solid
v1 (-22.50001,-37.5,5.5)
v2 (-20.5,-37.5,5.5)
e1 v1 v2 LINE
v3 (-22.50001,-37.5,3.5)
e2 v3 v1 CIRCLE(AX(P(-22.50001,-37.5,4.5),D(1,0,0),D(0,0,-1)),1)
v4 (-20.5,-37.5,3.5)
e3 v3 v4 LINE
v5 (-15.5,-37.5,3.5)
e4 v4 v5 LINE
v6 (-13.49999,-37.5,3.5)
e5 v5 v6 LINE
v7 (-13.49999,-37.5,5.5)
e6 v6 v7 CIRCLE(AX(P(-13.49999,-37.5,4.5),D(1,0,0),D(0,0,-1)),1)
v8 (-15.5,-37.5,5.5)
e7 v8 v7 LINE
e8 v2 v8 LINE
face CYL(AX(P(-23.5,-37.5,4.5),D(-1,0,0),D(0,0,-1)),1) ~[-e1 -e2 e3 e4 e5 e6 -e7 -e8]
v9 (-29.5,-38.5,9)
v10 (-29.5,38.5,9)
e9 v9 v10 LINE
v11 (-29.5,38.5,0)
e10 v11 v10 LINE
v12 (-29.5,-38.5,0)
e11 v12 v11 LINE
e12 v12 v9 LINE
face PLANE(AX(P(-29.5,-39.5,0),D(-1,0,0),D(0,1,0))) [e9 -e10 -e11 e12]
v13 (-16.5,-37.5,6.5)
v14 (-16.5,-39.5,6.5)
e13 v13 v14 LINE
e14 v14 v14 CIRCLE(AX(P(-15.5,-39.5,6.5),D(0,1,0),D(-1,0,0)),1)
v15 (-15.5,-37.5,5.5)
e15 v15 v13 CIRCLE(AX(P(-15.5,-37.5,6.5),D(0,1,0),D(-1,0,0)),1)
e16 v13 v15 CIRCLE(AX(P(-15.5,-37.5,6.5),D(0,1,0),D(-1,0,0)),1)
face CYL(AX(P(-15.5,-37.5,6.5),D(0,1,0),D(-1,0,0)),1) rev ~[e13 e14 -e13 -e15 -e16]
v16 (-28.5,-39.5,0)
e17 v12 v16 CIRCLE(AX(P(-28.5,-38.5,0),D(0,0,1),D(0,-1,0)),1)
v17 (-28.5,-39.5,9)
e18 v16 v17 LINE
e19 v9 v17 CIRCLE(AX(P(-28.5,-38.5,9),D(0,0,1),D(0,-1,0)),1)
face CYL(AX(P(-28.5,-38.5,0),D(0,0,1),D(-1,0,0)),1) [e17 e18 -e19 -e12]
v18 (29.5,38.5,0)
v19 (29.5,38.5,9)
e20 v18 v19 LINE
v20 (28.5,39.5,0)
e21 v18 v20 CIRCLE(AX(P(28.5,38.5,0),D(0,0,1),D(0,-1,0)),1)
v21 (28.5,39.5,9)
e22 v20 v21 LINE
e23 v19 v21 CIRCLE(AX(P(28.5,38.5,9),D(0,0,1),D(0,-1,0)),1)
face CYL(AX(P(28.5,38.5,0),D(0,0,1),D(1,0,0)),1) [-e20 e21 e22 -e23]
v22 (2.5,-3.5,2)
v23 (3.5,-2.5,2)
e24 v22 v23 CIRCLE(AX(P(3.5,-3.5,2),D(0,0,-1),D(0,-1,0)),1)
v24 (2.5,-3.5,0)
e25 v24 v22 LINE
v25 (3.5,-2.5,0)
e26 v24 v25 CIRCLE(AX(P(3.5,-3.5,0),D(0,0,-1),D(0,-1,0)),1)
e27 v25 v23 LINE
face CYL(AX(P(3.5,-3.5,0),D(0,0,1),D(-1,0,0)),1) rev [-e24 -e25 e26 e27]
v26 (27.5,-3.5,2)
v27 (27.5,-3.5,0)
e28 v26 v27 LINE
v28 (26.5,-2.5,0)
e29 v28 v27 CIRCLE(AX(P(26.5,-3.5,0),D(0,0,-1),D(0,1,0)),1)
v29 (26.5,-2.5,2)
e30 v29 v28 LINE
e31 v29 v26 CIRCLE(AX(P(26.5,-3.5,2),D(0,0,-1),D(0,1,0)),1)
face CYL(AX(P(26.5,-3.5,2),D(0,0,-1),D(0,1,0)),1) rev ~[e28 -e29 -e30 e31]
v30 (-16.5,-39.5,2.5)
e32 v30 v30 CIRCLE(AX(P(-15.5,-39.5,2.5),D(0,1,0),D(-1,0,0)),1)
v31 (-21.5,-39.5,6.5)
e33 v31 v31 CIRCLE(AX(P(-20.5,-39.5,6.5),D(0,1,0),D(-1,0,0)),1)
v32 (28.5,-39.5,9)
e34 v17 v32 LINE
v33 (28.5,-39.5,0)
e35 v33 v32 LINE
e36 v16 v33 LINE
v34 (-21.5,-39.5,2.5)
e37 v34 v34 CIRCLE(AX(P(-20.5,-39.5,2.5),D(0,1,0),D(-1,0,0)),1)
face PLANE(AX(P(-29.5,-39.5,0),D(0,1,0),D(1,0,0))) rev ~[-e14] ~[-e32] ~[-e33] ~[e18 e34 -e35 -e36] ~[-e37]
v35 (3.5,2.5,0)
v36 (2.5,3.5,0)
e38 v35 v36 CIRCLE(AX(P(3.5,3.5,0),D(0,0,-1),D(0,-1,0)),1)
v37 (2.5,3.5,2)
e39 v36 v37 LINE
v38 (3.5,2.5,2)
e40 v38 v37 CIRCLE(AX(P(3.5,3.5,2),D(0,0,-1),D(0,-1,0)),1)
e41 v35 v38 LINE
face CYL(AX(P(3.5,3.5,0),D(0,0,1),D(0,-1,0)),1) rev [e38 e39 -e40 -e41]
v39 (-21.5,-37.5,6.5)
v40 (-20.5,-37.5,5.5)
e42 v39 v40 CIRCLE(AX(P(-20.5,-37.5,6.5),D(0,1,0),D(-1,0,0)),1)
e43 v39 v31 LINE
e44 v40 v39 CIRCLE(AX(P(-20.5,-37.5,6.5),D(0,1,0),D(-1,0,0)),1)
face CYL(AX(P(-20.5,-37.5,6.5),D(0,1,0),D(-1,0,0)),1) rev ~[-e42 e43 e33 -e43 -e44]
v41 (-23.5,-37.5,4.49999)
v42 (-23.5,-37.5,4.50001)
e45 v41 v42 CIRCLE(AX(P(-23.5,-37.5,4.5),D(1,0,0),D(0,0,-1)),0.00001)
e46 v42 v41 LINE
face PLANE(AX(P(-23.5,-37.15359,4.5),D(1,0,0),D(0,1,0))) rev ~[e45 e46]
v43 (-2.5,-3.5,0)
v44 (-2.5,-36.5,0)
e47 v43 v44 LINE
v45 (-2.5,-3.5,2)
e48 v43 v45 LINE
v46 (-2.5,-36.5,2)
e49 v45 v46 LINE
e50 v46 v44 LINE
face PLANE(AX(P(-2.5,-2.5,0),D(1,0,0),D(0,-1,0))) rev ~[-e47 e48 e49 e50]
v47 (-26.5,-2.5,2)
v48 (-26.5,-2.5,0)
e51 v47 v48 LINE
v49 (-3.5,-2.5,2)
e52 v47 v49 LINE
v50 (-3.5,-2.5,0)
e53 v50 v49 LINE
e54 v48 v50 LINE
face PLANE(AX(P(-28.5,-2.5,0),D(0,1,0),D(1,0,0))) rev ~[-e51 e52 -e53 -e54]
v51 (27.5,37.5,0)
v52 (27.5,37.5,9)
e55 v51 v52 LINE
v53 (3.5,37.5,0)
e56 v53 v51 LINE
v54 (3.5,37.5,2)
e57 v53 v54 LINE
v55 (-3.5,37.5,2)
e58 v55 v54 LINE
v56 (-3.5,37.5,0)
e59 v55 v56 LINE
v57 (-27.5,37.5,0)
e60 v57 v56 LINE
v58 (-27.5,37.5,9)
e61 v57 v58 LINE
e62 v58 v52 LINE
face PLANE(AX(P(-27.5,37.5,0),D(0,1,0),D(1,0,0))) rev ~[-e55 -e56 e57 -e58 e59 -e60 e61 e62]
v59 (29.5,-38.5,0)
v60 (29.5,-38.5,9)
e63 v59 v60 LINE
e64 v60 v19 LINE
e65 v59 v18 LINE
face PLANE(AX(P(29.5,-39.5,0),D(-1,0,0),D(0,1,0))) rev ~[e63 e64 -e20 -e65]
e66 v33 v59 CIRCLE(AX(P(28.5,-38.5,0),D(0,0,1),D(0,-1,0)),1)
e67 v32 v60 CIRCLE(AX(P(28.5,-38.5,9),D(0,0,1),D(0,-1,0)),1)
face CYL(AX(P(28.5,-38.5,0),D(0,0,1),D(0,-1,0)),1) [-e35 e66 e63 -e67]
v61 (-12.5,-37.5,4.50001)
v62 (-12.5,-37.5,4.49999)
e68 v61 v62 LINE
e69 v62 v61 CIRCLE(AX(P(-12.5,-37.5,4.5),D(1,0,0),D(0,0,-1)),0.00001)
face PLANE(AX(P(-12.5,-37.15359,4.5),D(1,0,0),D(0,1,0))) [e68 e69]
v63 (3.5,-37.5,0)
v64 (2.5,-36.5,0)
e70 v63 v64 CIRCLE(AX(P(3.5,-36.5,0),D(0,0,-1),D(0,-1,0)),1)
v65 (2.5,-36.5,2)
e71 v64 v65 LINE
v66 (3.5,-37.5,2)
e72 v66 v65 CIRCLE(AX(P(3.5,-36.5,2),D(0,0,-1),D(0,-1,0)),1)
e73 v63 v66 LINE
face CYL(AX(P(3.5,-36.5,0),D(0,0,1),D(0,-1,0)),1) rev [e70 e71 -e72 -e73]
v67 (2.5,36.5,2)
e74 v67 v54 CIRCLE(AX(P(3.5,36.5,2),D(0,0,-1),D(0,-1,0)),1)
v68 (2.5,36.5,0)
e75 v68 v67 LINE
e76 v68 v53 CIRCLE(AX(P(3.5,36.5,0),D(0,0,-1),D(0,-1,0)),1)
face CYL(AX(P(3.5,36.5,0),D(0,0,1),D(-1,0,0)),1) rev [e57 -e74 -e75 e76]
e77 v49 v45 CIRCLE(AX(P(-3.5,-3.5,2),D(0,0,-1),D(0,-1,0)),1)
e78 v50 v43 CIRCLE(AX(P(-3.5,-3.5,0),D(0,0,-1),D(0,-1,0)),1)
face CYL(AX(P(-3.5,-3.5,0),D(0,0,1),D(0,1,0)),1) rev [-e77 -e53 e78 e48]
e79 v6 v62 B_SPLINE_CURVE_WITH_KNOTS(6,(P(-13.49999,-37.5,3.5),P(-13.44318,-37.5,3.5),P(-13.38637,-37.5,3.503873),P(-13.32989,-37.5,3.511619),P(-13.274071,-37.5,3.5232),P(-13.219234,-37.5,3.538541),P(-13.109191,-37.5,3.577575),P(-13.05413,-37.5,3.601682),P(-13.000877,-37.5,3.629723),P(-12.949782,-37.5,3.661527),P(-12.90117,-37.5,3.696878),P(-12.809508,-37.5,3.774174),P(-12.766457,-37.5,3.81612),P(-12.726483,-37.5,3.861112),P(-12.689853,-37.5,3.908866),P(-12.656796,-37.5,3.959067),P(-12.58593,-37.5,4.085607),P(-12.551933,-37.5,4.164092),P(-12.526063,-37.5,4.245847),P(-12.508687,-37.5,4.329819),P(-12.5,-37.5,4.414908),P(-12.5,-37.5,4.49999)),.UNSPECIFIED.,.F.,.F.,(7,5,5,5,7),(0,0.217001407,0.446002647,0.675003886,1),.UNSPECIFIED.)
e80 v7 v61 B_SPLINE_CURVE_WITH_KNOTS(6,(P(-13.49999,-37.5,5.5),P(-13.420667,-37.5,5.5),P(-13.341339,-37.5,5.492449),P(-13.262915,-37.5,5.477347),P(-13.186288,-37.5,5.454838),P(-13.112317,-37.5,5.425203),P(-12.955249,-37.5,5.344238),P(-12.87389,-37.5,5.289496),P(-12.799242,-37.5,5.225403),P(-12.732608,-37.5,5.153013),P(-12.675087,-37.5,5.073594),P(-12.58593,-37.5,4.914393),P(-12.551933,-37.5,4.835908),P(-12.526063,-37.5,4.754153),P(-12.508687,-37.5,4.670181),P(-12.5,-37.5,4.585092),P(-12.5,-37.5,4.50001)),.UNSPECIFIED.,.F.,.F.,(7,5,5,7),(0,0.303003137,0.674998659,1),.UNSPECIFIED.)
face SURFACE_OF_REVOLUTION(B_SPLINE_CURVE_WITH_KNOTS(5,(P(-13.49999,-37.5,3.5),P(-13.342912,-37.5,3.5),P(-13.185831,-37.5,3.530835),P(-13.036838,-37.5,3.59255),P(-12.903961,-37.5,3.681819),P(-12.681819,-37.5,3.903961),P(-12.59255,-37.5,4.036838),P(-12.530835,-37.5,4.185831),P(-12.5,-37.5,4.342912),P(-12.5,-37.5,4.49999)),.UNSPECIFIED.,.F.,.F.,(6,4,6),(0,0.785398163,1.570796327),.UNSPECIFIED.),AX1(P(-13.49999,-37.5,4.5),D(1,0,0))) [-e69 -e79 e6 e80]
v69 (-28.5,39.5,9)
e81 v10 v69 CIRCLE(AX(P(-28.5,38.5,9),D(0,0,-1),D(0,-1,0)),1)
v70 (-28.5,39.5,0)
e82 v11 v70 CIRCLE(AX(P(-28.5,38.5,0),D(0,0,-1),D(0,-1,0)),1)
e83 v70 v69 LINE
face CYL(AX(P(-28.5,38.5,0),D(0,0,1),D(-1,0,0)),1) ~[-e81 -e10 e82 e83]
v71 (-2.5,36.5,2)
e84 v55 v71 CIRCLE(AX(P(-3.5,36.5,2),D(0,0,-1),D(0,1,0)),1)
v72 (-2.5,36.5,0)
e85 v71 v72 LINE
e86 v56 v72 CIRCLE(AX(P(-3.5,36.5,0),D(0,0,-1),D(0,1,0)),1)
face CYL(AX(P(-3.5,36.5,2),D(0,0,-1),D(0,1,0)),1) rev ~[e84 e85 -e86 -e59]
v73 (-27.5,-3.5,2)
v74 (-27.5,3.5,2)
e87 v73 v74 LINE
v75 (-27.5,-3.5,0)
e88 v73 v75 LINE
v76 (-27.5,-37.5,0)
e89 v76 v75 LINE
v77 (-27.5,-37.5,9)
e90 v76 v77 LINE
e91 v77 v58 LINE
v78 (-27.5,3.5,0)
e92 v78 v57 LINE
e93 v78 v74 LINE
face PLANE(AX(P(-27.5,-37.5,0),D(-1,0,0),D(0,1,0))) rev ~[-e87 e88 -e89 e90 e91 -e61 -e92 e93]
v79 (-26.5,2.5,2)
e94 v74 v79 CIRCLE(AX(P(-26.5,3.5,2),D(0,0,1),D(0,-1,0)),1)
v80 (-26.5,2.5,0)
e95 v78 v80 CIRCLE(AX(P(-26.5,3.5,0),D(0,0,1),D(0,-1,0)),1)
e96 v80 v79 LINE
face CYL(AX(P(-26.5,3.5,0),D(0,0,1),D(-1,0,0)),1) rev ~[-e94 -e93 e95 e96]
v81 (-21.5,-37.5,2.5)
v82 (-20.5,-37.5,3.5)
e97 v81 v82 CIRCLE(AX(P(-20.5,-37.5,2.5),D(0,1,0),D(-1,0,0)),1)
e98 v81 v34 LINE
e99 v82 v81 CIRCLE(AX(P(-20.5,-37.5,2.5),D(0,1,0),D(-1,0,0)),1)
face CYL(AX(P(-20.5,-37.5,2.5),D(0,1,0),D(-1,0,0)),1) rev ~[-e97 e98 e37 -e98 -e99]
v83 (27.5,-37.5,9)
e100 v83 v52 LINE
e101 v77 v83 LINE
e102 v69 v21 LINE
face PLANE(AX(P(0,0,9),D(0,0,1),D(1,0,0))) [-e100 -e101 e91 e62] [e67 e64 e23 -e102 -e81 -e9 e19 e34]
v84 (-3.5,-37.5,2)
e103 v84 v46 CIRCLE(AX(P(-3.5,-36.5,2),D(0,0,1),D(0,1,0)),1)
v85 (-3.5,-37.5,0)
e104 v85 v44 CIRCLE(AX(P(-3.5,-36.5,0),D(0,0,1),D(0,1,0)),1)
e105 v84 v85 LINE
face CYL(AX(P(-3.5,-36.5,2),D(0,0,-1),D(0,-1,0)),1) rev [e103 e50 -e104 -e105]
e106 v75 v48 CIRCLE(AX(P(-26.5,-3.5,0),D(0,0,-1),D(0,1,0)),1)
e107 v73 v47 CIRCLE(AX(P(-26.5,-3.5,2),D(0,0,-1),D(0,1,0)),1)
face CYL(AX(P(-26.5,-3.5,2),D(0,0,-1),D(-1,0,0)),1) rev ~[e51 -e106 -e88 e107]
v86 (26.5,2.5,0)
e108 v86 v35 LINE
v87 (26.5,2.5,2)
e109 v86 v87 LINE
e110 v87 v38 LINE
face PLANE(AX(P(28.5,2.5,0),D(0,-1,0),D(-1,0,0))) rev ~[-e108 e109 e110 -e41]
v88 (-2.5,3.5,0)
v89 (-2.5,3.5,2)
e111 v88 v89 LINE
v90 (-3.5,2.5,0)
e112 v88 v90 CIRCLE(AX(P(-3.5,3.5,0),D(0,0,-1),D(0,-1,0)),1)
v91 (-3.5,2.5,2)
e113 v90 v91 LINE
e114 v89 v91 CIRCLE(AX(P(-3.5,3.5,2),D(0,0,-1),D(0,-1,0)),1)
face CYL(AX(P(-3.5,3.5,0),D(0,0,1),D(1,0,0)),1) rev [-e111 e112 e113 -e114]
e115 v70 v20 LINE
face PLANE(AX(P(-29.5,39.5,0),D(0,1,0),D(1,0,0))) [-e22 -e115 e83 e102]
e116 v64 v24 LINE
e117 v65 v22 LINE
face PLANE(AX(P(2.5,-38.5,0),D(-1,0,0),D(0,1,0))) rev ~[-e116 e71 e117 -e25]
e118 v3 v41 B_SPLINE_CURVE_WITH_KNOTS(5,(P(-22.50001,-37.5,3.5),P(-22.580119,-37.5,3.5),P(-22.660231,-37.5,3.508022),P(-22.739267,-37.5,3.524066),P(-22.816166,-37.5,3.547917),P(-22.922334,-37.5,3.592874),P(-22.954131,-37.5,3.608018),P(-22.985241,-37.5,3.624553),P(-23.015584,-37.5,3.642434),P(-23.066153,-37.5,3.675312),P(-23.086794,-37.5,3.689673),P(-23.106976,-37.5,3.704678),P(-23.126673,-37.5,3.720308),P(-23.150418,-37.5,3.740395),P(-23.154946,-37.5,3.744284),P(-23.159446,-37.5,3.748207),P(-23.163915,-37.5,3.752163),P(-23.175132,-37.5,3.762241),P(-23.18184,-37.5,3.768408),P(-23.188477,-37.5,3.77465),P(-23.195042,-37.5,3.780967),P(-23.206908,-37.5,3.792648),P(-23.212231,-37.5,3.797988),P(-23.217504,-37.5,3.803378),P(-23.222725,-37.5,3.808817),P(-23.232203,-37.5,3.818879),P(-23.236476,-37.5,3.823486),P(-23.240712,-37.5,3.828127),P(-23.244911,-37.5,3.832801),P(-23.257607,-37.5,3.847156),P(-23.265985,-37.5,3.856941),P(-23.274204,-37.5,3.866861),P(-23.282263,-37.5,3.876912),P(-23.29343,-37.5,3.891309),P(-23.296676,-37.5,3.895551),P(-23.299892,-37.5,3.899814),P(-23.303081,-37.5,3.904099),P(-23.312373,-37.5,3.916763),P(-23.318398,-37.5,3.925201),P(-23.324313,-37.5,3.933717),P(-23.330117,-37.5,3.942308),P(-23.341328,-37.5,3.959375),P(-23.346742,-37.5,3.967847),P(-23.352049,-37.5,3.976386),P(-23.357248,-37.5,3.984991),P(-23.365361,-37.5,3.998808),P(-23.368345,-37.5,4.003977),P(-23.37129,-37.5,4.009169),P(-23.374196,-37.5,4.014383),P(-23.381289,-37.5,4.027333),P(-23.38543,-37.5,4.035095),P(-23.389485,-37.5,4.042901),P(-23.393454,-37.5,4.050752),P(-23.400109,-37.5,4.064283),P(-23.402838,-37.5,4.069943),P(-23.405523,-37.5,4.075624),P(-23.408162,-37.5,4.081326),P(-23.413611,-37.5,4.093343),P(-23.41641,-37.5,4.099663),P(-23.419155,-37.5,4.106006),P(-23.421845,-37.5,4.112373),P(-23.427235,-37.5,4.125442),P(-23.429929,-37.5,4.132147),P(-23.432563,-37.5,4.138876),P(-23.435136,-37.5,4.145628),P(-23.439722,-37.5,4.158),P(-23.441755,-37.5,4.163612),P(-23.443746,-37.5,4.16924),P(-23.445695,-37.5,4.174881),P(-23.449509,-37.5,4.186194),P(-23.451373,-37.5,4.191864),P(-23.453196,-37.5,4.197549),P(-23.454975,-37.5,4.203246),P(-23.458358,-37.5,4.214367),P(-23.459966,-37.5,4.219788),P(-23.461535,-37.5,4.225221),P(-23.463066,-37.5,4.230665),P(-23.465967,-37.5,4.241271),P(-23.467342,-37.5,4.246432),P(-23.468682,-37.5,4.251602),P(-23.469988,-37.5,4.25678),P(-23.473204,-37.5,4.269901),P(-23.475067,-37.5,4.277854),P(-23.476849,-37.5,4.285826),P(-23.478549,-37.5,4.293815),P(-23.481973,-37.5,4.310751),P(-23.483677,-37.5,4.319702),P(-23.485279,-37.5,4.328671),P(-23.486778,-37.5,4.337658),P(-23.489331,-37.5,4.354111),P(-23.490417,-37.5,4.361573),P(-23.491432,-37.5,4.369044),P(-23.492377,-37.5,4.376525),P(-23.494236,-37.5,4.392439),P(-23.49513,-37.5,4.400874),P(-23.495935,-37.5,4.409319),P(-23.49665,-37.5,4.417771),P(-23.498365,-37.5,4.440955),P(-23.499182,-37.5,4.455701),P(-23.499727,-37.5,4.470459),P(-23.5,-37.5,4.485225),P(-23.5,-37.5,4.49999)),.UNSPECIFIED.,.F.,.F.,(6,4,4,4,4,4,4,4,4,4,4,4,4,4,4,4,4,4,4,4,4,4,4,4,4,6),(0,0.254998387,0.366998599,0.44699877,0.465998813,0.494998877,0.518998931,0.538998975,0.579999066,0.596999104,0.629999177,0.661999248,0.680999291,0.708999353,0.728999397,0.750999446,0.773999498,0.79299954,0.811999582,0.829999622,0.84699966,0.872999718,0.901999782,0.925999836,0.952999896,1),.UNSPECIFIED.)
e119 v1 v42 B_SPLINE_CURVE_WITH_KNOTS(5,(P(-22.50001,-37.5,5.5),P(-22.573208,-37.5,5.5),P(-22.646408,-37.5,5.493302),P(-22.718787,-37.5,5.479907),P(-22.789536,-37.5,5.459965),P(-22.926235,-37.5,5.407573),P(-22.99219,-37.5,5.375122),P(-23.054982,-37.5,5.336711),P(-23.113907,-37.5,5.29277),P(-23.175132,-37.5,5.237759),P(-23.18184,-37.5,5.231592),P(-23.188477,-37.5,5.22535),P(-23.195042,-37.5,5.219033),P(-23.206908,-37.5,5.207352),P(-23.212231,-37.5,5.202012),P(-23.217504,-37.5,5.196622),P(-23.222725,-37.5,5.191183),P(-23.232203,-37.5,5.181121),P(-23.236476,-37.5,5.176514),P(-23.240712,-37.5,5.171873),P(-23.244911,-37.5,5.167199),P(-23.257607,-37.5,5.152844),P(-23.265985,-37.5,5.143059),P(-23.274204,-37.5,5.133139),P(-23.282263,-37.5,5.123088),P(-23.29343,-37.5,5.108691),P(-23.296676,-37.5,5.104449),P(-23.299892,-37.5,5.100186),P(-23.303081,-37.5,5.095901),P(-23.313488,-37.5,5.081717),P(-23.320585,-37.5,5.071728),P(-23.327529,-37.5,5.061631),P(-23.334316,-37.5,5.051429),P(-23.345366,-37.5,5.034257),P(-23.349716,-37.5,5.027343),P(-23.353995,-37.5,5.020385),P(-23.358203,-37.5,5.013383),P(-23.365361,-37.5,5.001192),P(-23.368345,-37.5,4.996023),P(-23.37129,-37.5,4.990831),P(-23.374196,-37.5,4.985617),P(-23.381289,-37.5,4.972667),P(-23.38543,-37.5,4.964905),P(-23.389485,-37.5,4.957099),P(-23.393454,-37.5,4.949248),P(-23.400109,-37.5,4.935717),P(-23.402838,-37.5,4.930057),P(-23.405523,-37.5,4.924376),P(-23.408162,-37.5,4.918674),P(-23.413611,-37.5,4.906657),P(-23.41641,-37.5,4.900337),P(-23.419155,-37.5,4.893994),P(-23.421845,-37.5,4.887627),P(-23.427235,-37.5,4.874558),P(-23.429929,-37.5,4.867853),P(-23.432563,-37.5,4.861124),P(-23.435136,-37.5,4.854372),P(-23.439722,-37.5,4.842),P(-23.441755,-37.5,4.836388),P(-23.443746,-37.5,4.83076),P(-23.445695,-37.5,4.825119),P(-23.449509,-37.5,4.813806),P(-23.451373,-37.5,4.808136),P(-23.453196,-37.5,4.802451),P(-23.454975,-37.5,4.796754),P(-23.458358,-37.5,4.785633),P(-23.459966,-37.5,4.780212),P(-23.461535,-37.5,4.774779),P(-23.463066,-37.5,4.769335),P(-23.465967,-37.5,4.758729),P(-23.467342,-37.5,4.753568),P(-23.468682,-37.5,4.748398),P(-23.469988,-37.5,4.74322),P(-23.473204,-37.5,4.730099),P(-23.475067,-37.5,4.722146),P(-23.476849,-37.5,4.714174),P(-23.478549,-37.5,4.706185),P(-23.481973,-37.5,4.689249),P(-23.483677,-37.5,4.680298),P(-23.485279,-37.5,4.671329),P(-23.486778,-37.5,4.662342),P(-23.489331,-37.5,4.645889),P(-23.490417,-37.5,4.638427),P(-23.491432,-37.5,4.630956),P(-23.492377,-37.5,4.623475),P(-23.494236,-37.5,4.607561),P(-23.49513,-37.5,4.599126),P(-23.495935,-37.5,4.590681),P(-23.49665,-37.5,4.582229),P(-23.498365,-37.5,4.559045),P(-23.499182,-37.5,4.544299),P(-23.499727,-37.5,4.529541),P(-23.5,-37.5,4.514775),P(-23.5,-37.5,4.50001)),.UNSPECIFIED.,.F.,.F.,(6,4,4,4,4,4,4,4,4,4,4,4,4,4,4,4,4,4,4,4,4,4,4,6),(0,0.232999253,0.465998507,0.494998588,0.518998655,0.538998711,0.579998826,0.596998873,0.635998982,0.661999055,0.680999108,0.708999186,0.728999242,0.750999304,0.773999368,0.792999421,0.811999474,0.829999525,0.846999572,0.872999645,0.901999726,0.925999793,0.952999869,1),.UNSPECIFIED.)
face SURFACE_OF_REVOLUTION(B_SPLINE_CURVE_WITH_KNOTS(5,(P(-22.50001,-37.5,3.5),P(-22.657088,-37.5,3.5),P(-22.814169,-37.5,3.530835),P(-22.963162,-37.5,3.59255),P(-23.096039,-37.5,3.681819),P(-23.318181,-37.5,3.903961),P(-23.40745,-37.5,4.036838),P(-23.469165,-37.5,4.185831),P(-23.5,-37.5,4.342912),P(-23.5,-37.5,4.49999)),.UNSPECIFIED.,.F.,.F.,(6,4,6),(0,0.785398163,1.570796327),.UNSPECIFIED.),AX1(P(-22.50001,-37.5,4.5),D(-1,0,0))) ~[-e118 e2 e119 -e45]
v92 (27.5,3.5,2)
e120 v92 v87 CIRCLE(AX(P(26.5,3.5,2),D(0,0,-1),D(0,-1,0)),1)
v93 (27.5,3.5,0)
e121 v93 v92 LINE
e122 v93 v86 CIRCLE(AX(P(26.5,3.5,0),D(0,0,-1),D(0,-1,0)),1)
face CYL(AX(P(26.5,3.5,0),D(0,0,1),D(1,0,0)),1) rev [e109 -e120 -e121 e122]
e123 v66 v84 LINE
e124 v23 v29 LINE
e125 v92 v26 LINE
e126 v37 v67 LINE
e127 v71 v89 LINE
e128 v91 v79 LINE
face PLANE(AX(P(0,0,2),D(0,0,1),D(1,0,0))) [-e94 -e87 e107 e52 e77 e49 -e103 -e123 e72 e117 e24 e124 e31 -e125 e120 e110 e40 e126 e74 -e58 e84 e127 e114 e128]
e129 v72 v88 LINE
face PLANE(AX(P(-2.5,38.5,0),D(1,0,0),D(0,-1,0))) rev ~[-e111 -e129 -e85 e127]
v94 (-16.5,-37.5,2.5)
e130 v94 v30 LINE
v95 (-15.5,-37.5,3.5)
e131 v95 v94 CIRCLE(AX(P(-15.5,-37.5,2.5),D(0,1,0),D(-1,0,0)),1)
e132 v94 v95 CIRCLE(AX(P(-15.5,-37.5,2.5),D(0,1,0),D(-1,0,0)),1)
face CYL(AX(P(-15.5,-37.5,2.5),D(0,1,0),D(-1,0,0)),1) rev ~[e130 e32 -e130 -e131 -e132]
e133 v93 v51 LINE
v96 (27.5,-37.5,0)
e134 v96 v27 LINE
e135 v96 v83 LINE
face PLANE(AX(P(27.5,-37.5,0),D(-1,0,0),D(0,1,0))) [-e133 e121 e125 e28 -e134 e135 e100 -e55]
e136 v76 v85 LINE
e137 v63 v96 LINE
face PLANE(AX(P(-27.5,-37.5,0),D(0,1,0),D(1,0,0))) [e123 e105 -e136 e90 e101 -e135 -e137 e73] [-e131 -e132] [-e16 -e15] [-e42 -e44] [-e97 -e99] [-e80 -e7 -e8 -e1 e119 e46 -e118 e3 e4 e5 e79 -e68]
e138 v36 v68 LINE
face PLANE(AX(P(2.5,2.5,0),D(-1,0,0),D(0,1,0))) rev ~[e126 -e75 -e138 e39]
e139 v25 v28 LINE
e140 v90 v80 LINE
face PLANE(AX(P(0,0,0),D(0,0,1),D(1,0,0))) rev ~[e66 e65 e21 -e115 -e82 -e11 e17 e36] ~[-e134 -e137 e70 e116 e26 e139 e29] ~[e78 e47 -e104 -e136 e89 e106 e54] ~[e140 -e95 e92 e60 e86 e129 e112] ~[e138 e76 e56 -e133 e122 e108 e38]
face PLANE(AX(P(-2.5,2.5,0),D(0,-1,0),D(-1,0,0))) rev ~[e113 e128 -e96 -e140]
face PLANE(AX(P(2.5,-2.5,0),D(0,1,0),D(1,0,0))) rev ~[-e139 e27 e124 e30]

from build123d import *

# Parameters (mm, degrees)
F0_W     = 59
F0_H     = 79
F0_W_2   = 55
F0_H_2   = 75
F1_DEPTH = 9
F3_DEPTH = 2
F4_R     = 1
F5_DEPTH = 2.001
F6_R     = 1
F9_DEPTH = 11
F10_R    = 0.99999


# Not quite as in the source:
# - two fillets or chamfers of one size are made in one step
# - a fillet or chamfer is up to 0.001 mm smaller than in the source, because OpenCascade refuses the exact size


with BuildPart() as f1:
    # F0 (on Top) → F1 (new body)
    with BuildSketch(Plane.XY):
        Rectangle(F0_W, F0_H)
        Rectangle(F0_W_2, F0_H_2, mode=Mode.SUBTRACT)
    extrude(amount=F1_DEPTH)

    # F2 (on Top) → F3 (join)
    with BuildSketch(Plane.XY):
        Polygon((2.5, 38.5), (-2.5, 38.5), (-2.5, 2.5), (-28.5, 2.5), (-28.5, -2.5), (-2.5, -2.5), (-2.5, -38.5), (2.5, -38.5), (2.5, -2.5), (28.5, -2.5), (28.5, 2.5), (2.5, 2.5), align=None)
    extrude(amount=F3_DEPTH)

    # F4 (on face) → F5 (cut, through all)
    with BuildSketch(Plane(origin=(0, -37.5, 0), x_dir=(-1, 0, 0), z_dir=(0, 1, 0))):
        with Locations((20.5, 2.5)):
            Circle(F4_R)
        with Locations((20.5, 6.5)):
            Circle(F4_R)
        with Locations((15.5, 2.5)):
            Circle(F4_R)
        with Locations((15.5, 6.5)):
            Circle(F4_R)
    extrude(amount=-F5_DEPTH, mode=Mode.SUBTRACT)

    # F6
    f6_edges = [f1.edges().sort_by_distance(p)[0] for p in [
        (-29.5, -39.5, 4.5),
        (29.5, -39.5, 4.5),
        (-29.5, 39.5, 4.5),
        (29.5, 39.5, 4.5),
        (-2.5, 2.5, 1),
        (2.5, 2.5, 1),
        (2.5, -2.5, 1),
        (-2.5, -2.5, 1),
        (2.5, -37.5, 1),
        (-2.5, -37.5, 1),
        (-27.5, -2.5, 1),
        (-27.5, 2.5, 1),
        (27.5, -2.5, 1),
        (27.5, 2.5, 1),
        (2.5, 37.5, 1),
        (-2.5, 37.5, 1),
    ]]
    fillet(f6_edges, radius=F6_R)

    # F8 (on offset) → F9 (join)
    with BuildSketch(Plane.YZ.offset(-23.5)):
        with BuildLine():
            ThreePointArc((-37.5, 3.5), (-36.5, 4.5), (-37.5, 5.5))
            Line((-37.5, 5.5), (-37.5, 3.5))
        make_face()
    extrude(amount=F9_DEPTH)

    # F10 (radius 1 in the source; OpenCascade refuses exactly that, so slightly less here)
    f10_edges = [f1.edges().sort_by_distance(p)[0] for p in [
        (-23.5, -36.5, 4.5),
        (-12.5, -36.5, 4.5),
    ]]
    fillet(f10_edges, radius=F10_R)


solid = f1.part
